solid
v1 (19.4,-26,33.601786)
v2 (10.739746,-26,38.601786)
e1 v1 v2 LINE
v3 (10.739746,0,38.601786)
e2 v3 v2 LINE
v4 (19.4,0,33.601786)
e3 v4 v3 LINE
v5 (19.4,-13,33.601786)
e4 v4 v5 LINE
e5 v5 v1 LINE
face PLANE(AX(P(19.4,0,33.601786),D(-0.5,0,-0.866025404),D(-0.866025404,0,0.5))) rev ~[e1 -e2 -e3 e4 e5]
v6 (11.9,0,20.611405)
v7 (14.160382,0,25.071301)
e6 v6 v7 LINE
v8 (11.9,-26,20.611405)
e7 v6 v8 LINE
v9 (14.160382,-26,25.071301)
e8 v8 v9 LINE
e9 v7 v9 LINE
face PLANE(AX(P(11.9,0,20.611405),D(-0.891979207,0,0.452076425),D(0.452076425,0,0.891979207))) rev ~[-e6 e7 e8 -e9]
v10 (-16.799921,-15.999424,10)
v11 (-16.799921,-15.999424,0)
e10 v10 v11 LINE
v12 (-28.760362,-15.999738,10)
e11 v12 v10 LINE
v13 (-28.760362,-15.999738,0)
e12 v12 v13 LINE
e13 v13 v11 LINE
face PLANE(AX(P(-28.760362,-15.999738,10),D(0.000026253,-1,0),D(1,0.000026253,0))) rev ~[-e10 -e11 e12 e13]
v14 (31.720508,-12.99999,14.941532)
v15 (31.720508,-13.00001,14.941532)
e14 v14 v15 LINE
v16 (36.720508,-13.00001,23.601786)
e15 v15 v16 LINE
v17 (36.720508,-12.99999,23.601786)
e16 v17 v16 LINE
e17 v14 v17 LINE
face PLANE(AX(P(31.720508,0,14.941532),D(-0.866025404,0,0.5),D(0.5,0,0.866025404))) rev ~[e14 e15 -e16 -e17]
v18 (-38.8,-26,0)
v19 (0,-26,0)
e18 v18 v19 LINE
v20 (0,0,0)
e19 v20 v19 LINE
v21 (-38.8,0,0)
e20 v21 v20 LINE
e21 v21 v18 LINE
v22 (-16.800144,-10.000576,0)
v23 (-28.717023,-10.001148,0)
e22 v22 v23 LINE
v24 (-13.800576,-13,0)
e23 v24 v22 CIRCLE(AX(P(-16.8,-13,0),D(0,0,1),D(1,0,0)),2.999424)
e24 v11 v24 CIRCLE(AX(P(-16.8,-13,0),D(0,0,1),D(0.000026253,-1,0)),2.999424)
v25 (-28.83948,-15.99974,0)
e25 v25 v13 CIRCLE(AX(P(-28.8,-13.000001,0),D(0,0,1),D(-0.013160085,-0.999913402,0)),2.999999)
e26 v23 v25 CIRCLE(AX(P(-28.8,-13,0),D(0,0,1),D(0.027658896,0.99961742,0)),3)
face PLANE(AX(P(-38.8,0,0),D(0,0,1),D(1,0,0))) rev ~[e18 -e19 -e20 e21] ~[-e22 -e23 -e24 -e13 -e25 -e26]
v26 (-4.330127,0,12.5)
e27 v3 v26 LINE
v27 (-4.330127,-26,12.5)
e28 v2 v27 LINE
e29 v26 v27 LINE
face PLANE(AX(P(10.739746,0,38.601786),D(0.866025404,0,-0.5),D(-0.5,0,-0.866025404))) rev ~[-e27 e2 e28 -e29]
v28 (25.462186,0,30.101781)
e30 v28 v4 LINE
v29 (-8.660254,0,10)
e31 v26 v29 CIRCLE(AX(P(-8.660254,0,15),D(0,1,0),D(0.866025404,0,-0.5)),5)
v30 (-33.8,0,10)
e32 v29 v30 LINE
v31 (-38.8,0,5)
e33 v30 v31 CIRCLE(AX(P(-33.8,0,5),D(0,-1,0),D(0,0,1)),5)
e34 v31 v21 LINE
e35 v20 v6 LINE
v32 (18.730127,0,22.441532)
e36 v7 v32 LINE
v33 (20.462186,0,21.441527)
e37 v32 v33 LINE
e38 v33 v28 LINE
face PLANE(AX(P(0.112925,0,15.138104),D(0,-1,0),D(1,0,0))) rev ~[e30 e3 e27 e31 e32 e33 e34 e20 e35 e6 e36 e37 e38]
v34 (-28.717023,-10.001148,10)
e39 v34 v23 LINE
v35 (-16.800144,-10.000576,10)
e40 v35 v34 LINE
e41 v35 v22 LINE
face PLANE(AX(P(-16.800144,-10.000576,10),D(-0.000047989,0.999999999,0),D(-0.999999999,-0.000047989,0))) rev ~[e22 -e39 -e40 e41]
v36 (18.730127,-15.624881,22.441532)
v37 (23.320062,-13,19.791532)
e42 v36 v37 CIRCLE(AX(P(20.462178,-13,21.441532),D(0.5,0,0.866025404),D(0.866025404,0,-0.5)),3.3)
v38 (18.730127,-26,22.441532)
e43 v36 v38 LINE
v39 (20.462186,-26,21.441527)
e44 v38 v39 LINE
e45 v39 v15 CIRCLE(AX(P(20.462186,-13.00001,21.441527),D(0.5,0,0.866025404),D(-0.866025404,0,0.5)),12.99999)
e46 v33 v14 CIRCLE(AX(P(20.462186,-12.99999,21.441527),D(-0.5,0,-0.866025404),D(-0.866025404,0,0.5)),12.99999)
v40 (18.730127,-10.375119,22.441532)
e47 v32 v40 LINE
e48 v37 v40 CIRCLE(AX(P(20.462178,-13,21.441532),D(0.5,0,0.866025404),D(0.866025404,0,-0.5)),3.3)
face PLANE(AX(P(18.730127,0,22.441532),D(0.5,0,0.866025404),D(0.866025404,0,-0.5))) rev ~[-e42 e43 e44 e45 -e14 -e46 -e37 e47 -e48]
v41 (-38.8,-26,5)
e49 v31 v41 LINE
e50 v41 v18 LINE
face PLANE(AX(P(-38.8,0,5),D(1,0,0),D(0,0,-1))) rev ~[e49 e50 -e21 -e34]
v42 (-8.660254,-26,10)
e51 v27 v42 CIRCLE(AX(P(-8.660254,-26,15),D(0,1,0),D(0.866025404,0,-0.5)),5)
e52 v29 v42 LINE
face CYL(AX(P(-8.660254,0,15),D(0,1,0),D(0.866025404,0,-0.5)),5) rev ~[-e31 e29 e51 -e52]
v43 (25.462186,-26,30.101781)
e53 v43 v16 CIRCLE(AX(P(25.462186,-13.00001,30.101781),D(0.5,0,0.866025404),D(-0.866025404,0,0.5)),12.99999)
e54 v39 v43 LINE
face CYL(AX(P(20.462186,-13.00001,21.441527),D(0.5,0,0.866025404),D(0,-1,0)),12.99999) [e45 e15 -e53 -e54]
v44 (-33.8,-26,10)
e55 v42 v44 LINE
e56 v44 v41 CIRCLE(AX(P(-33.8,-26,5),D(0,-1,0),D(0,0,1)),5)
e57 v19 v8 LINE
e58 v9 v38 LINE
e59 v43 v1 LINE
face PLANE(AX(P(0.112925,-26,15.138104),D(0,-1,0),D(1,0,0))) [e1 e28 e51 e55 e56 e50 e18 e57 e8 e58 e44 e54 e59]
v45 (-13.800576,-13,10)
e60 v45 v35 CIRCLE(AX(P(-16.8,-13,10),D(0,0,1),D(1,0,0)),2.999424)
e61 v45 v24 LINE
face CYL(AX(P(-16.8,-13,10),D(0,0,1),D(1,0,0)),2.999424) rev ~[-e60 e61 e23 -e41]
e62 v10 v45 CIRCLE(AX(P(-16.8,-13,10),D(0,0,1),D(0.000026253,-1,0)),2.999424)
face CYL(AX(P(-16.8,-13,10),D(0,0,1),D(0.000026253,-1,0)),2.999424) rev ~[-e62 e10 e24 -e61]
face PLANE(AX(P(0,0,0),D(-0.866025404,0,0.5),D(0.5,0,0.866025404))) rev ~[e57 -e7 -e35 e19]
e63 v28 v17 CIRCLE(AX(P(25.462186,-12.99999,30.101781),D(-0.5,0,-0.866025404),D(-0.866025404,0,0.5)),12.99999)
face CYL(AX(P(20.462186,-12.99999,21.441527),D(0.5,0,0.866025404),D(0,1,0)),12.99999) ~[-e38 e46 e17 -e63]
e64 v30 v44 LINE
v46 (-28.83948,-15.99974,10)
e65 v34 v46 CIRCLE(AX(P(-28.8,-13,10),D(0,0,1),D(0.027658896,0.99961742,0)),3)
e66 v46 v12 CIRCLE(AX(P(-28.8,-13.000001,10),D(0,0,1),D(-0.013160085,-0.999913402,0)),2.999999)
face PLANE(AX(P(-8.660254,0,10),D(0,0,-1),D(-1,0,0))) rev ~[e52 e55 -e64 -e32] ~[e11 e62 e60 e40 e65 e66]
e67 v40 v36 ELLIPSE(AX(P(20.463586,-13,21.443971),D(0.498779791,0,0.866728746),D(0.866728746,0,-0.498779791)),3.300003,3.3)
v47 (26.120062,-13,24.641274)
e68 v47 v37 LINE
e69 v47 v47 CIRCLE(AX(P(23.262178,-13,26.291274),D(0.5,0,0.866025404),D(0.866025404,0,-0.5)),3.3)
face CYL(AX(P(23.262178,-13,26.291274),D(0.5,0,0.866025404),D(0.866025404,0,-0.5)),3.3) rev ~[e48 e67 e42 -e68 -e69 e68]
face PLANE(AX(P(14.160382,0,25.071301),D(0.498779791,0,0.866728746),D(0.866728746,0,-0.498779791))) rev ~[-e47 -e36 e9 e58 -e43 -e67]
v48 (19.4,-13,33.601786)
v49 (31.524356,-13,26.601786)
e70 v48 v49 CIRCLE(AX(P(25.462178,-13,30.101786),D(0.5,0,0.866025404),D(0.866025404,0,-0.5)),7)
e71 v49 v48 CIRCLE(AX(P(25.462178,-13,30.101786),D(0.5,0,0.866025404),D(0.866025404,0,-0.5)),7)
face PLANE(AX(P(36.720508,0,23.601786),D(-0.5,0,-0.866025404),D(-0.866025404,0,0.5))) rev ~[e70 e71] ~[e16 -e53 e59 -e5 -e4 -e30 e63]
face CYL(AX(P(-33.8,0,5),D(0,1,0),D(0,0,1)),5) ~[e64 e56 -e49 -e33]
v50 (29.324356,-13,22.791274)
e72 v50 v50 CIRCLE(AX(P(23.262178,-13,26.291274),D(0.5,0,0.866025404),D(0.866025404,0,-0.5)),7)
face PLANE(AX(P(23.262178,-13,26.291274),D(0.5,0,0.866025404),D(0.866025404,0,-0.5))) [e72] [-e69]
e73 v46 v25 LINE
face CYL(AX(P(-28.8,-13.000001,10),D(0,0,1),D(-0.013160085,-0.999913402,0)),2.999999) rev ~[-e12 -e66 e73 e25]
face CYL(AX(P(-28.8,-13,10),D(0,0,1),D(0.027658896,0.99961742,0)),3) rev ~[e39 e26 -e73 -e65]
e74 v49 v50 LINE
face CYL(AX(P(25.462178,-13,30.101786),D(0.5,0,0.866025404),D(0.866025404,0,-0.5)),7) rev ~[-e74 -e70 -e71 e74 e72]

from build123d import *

# Parameters (mm, degrees)
F1_DEPTH = 26
F3_DEPTH = 10.001
F4_R     = 12.99999
F5_R     = 7
F6_DEPTH = 4.4
F7_R     = 3.3
F8_DEPTH = 53.801


# Not quite as in the source:
# - a fillet or chamfer is up to 0.001 mm smaller than in the source, because OpenCascade refuses the exact size


with BuildPart() as f1:
    # F0 (on Front) → F1 (new body)
    with BuildSketch(Plane.XZ):
        with BuildLine():
            Line((-38.8, 0), (0, 0))
            Line((0, 0), (11.9, 20.6114046101))
            Line((11.9, 20.6114046101), (14.1603821252, 25.0713006457))
            Line((14.1603821252, 25.0713006457), (18.7301270189, 22.441531629))
            Line((18.7301270189, 22.441531629), (31.7205080757, 14.941531629))
            Line((31.7205080757, 14.941531629), (36.7205080757, 23.6017856668))
            Line((36.7205080757, 23.6017856668), (19.4, 33.6017856668))
            Line((19.4, 33.6017856668), (10.7397459622, 38.6017856668))
            Line((10.7397459622, 38.6017856668), (-4.3301270189, 12.5))
            ThreePointArc((-4.3301270189, 12.5), (-6.1602540378, 10.6698729811), (-8.6602540378, 10))
            Line((-8.6602540378, 10), (-33.8, 10))
            ThreePointArc((-33.8, 10), (-37.3355339059, 8.5355339059), (-38.8, 5))
            Line((-38.8, 5), (-38.8, 0))
        make_face()
    extrude(amount=F1_DEPTH)

    # F2 (on face) → F3 (cut, through all)
    with BuildSketch(Plane.XY.offset(10)):
        with BuildLine():
            ThreePointArc((-28.7603622502, -15.99973813), (-26.6647115828, -15.1072596839), (-25.8, -13))
            ThreePointArc((-25.8, -13), (-26.6495430639, -10.9082220563), (-28.7170233106, -10.0011477414))
            ThreePointArc((-28.7170233106, -10.0011477414), (-31.7993750812, -12.9387699222), (-28.839480247, -15.9997402071))
            Line((-28.839480247, -15.9997402071), (-28.7603622502, -15.99973813))
        make_face()
        with BuildLine():
            ThreePointArc((-28.7170233106, -10.0011477414), (-26.6495430639, -10.9082220563), (-25.8, -13))
            ThreePointArc((-25.8, -13), (-26.6647115828, -15.1072596839), (-28.7603622502, -15.99973813))
            Line((-28.7603622502, -15.99973813), (-16.7999212569, -15.9994241356))
            ThreePointArc((-16.7999212569, -15.9994241356), (-19.7994241345, -13.0001113407), (-16.8001439382, -10.0005758668))
            Line((-16.8001439382, -10.0005758668), (-28.7170233106, -10.0011477414))
        make_face()
        with BuildLine():
            ThreePointArc((-28.839480247, -15.9997402071), (-28.7999212418, -15.999999999), (-28.7603622502, -15.99973813))
            Line((-28.7603622502, -15.99973813), (-28.839480247, -15.9997402071))
        make_face()
        with BuildLine():
            ThreePointArc((-13.8005758634, -13), (-14.6791377438, -10.8790359641), (-16.8001439382, -10.0005758668))
            ThreePointArc((-16.8001439382, -10.0005758668), (-19.7994241345, -13.0001113407), (-16.7999212569, -15.9994241356))
            ThreePointArc((-16.7999212569, -15.9994241356), (-14.6790590136, -15.1208853066), (-13.8005758634, -13))
        make_face()
    extrude(amount=-F3_DEPTH, mode=Mode.SUBTRACT)

    # F4 (radius 13 in the source; OpenCascade refuses exactly that, so slightly less here)
    f4_edges = [f1.edges().sort_by_distance(p)[0] for p in [
        (34.220508, -26, 19.271659),
        (34.220508, 0, 19.271659),
    ]]
    fillet(f4_edges, radius=F4_R)

    # F5 (on face) → F6 (cut)
    with BuildSketch(Plane(origin=(19.4, 0, 33.6017856668), x_dir=(0.8660254038, 0, -0.5), z_dir=(0.5, 0, 0.8660254038))):
        with Locations((7, -13)):
            Circle(F5_R)
    extrude(amount=-F6_DEPTH, mode=Mode.SUBTRACT)

    # F7 (on face) → F8 (cut, through all)
    with BuildSketch(Plane(origin=(17.2, 0, 29.7912738902), x_dir=(0.8660254038, 0, -0.5), z_dir=(0.5, 0, 0.8660254038))):
        with Locations((7, -13)):
            Circle(F7_R)
    extrude(amount=-F8_DEPTH, mode=Mode.SUBTRACT)


solid = f1.part
